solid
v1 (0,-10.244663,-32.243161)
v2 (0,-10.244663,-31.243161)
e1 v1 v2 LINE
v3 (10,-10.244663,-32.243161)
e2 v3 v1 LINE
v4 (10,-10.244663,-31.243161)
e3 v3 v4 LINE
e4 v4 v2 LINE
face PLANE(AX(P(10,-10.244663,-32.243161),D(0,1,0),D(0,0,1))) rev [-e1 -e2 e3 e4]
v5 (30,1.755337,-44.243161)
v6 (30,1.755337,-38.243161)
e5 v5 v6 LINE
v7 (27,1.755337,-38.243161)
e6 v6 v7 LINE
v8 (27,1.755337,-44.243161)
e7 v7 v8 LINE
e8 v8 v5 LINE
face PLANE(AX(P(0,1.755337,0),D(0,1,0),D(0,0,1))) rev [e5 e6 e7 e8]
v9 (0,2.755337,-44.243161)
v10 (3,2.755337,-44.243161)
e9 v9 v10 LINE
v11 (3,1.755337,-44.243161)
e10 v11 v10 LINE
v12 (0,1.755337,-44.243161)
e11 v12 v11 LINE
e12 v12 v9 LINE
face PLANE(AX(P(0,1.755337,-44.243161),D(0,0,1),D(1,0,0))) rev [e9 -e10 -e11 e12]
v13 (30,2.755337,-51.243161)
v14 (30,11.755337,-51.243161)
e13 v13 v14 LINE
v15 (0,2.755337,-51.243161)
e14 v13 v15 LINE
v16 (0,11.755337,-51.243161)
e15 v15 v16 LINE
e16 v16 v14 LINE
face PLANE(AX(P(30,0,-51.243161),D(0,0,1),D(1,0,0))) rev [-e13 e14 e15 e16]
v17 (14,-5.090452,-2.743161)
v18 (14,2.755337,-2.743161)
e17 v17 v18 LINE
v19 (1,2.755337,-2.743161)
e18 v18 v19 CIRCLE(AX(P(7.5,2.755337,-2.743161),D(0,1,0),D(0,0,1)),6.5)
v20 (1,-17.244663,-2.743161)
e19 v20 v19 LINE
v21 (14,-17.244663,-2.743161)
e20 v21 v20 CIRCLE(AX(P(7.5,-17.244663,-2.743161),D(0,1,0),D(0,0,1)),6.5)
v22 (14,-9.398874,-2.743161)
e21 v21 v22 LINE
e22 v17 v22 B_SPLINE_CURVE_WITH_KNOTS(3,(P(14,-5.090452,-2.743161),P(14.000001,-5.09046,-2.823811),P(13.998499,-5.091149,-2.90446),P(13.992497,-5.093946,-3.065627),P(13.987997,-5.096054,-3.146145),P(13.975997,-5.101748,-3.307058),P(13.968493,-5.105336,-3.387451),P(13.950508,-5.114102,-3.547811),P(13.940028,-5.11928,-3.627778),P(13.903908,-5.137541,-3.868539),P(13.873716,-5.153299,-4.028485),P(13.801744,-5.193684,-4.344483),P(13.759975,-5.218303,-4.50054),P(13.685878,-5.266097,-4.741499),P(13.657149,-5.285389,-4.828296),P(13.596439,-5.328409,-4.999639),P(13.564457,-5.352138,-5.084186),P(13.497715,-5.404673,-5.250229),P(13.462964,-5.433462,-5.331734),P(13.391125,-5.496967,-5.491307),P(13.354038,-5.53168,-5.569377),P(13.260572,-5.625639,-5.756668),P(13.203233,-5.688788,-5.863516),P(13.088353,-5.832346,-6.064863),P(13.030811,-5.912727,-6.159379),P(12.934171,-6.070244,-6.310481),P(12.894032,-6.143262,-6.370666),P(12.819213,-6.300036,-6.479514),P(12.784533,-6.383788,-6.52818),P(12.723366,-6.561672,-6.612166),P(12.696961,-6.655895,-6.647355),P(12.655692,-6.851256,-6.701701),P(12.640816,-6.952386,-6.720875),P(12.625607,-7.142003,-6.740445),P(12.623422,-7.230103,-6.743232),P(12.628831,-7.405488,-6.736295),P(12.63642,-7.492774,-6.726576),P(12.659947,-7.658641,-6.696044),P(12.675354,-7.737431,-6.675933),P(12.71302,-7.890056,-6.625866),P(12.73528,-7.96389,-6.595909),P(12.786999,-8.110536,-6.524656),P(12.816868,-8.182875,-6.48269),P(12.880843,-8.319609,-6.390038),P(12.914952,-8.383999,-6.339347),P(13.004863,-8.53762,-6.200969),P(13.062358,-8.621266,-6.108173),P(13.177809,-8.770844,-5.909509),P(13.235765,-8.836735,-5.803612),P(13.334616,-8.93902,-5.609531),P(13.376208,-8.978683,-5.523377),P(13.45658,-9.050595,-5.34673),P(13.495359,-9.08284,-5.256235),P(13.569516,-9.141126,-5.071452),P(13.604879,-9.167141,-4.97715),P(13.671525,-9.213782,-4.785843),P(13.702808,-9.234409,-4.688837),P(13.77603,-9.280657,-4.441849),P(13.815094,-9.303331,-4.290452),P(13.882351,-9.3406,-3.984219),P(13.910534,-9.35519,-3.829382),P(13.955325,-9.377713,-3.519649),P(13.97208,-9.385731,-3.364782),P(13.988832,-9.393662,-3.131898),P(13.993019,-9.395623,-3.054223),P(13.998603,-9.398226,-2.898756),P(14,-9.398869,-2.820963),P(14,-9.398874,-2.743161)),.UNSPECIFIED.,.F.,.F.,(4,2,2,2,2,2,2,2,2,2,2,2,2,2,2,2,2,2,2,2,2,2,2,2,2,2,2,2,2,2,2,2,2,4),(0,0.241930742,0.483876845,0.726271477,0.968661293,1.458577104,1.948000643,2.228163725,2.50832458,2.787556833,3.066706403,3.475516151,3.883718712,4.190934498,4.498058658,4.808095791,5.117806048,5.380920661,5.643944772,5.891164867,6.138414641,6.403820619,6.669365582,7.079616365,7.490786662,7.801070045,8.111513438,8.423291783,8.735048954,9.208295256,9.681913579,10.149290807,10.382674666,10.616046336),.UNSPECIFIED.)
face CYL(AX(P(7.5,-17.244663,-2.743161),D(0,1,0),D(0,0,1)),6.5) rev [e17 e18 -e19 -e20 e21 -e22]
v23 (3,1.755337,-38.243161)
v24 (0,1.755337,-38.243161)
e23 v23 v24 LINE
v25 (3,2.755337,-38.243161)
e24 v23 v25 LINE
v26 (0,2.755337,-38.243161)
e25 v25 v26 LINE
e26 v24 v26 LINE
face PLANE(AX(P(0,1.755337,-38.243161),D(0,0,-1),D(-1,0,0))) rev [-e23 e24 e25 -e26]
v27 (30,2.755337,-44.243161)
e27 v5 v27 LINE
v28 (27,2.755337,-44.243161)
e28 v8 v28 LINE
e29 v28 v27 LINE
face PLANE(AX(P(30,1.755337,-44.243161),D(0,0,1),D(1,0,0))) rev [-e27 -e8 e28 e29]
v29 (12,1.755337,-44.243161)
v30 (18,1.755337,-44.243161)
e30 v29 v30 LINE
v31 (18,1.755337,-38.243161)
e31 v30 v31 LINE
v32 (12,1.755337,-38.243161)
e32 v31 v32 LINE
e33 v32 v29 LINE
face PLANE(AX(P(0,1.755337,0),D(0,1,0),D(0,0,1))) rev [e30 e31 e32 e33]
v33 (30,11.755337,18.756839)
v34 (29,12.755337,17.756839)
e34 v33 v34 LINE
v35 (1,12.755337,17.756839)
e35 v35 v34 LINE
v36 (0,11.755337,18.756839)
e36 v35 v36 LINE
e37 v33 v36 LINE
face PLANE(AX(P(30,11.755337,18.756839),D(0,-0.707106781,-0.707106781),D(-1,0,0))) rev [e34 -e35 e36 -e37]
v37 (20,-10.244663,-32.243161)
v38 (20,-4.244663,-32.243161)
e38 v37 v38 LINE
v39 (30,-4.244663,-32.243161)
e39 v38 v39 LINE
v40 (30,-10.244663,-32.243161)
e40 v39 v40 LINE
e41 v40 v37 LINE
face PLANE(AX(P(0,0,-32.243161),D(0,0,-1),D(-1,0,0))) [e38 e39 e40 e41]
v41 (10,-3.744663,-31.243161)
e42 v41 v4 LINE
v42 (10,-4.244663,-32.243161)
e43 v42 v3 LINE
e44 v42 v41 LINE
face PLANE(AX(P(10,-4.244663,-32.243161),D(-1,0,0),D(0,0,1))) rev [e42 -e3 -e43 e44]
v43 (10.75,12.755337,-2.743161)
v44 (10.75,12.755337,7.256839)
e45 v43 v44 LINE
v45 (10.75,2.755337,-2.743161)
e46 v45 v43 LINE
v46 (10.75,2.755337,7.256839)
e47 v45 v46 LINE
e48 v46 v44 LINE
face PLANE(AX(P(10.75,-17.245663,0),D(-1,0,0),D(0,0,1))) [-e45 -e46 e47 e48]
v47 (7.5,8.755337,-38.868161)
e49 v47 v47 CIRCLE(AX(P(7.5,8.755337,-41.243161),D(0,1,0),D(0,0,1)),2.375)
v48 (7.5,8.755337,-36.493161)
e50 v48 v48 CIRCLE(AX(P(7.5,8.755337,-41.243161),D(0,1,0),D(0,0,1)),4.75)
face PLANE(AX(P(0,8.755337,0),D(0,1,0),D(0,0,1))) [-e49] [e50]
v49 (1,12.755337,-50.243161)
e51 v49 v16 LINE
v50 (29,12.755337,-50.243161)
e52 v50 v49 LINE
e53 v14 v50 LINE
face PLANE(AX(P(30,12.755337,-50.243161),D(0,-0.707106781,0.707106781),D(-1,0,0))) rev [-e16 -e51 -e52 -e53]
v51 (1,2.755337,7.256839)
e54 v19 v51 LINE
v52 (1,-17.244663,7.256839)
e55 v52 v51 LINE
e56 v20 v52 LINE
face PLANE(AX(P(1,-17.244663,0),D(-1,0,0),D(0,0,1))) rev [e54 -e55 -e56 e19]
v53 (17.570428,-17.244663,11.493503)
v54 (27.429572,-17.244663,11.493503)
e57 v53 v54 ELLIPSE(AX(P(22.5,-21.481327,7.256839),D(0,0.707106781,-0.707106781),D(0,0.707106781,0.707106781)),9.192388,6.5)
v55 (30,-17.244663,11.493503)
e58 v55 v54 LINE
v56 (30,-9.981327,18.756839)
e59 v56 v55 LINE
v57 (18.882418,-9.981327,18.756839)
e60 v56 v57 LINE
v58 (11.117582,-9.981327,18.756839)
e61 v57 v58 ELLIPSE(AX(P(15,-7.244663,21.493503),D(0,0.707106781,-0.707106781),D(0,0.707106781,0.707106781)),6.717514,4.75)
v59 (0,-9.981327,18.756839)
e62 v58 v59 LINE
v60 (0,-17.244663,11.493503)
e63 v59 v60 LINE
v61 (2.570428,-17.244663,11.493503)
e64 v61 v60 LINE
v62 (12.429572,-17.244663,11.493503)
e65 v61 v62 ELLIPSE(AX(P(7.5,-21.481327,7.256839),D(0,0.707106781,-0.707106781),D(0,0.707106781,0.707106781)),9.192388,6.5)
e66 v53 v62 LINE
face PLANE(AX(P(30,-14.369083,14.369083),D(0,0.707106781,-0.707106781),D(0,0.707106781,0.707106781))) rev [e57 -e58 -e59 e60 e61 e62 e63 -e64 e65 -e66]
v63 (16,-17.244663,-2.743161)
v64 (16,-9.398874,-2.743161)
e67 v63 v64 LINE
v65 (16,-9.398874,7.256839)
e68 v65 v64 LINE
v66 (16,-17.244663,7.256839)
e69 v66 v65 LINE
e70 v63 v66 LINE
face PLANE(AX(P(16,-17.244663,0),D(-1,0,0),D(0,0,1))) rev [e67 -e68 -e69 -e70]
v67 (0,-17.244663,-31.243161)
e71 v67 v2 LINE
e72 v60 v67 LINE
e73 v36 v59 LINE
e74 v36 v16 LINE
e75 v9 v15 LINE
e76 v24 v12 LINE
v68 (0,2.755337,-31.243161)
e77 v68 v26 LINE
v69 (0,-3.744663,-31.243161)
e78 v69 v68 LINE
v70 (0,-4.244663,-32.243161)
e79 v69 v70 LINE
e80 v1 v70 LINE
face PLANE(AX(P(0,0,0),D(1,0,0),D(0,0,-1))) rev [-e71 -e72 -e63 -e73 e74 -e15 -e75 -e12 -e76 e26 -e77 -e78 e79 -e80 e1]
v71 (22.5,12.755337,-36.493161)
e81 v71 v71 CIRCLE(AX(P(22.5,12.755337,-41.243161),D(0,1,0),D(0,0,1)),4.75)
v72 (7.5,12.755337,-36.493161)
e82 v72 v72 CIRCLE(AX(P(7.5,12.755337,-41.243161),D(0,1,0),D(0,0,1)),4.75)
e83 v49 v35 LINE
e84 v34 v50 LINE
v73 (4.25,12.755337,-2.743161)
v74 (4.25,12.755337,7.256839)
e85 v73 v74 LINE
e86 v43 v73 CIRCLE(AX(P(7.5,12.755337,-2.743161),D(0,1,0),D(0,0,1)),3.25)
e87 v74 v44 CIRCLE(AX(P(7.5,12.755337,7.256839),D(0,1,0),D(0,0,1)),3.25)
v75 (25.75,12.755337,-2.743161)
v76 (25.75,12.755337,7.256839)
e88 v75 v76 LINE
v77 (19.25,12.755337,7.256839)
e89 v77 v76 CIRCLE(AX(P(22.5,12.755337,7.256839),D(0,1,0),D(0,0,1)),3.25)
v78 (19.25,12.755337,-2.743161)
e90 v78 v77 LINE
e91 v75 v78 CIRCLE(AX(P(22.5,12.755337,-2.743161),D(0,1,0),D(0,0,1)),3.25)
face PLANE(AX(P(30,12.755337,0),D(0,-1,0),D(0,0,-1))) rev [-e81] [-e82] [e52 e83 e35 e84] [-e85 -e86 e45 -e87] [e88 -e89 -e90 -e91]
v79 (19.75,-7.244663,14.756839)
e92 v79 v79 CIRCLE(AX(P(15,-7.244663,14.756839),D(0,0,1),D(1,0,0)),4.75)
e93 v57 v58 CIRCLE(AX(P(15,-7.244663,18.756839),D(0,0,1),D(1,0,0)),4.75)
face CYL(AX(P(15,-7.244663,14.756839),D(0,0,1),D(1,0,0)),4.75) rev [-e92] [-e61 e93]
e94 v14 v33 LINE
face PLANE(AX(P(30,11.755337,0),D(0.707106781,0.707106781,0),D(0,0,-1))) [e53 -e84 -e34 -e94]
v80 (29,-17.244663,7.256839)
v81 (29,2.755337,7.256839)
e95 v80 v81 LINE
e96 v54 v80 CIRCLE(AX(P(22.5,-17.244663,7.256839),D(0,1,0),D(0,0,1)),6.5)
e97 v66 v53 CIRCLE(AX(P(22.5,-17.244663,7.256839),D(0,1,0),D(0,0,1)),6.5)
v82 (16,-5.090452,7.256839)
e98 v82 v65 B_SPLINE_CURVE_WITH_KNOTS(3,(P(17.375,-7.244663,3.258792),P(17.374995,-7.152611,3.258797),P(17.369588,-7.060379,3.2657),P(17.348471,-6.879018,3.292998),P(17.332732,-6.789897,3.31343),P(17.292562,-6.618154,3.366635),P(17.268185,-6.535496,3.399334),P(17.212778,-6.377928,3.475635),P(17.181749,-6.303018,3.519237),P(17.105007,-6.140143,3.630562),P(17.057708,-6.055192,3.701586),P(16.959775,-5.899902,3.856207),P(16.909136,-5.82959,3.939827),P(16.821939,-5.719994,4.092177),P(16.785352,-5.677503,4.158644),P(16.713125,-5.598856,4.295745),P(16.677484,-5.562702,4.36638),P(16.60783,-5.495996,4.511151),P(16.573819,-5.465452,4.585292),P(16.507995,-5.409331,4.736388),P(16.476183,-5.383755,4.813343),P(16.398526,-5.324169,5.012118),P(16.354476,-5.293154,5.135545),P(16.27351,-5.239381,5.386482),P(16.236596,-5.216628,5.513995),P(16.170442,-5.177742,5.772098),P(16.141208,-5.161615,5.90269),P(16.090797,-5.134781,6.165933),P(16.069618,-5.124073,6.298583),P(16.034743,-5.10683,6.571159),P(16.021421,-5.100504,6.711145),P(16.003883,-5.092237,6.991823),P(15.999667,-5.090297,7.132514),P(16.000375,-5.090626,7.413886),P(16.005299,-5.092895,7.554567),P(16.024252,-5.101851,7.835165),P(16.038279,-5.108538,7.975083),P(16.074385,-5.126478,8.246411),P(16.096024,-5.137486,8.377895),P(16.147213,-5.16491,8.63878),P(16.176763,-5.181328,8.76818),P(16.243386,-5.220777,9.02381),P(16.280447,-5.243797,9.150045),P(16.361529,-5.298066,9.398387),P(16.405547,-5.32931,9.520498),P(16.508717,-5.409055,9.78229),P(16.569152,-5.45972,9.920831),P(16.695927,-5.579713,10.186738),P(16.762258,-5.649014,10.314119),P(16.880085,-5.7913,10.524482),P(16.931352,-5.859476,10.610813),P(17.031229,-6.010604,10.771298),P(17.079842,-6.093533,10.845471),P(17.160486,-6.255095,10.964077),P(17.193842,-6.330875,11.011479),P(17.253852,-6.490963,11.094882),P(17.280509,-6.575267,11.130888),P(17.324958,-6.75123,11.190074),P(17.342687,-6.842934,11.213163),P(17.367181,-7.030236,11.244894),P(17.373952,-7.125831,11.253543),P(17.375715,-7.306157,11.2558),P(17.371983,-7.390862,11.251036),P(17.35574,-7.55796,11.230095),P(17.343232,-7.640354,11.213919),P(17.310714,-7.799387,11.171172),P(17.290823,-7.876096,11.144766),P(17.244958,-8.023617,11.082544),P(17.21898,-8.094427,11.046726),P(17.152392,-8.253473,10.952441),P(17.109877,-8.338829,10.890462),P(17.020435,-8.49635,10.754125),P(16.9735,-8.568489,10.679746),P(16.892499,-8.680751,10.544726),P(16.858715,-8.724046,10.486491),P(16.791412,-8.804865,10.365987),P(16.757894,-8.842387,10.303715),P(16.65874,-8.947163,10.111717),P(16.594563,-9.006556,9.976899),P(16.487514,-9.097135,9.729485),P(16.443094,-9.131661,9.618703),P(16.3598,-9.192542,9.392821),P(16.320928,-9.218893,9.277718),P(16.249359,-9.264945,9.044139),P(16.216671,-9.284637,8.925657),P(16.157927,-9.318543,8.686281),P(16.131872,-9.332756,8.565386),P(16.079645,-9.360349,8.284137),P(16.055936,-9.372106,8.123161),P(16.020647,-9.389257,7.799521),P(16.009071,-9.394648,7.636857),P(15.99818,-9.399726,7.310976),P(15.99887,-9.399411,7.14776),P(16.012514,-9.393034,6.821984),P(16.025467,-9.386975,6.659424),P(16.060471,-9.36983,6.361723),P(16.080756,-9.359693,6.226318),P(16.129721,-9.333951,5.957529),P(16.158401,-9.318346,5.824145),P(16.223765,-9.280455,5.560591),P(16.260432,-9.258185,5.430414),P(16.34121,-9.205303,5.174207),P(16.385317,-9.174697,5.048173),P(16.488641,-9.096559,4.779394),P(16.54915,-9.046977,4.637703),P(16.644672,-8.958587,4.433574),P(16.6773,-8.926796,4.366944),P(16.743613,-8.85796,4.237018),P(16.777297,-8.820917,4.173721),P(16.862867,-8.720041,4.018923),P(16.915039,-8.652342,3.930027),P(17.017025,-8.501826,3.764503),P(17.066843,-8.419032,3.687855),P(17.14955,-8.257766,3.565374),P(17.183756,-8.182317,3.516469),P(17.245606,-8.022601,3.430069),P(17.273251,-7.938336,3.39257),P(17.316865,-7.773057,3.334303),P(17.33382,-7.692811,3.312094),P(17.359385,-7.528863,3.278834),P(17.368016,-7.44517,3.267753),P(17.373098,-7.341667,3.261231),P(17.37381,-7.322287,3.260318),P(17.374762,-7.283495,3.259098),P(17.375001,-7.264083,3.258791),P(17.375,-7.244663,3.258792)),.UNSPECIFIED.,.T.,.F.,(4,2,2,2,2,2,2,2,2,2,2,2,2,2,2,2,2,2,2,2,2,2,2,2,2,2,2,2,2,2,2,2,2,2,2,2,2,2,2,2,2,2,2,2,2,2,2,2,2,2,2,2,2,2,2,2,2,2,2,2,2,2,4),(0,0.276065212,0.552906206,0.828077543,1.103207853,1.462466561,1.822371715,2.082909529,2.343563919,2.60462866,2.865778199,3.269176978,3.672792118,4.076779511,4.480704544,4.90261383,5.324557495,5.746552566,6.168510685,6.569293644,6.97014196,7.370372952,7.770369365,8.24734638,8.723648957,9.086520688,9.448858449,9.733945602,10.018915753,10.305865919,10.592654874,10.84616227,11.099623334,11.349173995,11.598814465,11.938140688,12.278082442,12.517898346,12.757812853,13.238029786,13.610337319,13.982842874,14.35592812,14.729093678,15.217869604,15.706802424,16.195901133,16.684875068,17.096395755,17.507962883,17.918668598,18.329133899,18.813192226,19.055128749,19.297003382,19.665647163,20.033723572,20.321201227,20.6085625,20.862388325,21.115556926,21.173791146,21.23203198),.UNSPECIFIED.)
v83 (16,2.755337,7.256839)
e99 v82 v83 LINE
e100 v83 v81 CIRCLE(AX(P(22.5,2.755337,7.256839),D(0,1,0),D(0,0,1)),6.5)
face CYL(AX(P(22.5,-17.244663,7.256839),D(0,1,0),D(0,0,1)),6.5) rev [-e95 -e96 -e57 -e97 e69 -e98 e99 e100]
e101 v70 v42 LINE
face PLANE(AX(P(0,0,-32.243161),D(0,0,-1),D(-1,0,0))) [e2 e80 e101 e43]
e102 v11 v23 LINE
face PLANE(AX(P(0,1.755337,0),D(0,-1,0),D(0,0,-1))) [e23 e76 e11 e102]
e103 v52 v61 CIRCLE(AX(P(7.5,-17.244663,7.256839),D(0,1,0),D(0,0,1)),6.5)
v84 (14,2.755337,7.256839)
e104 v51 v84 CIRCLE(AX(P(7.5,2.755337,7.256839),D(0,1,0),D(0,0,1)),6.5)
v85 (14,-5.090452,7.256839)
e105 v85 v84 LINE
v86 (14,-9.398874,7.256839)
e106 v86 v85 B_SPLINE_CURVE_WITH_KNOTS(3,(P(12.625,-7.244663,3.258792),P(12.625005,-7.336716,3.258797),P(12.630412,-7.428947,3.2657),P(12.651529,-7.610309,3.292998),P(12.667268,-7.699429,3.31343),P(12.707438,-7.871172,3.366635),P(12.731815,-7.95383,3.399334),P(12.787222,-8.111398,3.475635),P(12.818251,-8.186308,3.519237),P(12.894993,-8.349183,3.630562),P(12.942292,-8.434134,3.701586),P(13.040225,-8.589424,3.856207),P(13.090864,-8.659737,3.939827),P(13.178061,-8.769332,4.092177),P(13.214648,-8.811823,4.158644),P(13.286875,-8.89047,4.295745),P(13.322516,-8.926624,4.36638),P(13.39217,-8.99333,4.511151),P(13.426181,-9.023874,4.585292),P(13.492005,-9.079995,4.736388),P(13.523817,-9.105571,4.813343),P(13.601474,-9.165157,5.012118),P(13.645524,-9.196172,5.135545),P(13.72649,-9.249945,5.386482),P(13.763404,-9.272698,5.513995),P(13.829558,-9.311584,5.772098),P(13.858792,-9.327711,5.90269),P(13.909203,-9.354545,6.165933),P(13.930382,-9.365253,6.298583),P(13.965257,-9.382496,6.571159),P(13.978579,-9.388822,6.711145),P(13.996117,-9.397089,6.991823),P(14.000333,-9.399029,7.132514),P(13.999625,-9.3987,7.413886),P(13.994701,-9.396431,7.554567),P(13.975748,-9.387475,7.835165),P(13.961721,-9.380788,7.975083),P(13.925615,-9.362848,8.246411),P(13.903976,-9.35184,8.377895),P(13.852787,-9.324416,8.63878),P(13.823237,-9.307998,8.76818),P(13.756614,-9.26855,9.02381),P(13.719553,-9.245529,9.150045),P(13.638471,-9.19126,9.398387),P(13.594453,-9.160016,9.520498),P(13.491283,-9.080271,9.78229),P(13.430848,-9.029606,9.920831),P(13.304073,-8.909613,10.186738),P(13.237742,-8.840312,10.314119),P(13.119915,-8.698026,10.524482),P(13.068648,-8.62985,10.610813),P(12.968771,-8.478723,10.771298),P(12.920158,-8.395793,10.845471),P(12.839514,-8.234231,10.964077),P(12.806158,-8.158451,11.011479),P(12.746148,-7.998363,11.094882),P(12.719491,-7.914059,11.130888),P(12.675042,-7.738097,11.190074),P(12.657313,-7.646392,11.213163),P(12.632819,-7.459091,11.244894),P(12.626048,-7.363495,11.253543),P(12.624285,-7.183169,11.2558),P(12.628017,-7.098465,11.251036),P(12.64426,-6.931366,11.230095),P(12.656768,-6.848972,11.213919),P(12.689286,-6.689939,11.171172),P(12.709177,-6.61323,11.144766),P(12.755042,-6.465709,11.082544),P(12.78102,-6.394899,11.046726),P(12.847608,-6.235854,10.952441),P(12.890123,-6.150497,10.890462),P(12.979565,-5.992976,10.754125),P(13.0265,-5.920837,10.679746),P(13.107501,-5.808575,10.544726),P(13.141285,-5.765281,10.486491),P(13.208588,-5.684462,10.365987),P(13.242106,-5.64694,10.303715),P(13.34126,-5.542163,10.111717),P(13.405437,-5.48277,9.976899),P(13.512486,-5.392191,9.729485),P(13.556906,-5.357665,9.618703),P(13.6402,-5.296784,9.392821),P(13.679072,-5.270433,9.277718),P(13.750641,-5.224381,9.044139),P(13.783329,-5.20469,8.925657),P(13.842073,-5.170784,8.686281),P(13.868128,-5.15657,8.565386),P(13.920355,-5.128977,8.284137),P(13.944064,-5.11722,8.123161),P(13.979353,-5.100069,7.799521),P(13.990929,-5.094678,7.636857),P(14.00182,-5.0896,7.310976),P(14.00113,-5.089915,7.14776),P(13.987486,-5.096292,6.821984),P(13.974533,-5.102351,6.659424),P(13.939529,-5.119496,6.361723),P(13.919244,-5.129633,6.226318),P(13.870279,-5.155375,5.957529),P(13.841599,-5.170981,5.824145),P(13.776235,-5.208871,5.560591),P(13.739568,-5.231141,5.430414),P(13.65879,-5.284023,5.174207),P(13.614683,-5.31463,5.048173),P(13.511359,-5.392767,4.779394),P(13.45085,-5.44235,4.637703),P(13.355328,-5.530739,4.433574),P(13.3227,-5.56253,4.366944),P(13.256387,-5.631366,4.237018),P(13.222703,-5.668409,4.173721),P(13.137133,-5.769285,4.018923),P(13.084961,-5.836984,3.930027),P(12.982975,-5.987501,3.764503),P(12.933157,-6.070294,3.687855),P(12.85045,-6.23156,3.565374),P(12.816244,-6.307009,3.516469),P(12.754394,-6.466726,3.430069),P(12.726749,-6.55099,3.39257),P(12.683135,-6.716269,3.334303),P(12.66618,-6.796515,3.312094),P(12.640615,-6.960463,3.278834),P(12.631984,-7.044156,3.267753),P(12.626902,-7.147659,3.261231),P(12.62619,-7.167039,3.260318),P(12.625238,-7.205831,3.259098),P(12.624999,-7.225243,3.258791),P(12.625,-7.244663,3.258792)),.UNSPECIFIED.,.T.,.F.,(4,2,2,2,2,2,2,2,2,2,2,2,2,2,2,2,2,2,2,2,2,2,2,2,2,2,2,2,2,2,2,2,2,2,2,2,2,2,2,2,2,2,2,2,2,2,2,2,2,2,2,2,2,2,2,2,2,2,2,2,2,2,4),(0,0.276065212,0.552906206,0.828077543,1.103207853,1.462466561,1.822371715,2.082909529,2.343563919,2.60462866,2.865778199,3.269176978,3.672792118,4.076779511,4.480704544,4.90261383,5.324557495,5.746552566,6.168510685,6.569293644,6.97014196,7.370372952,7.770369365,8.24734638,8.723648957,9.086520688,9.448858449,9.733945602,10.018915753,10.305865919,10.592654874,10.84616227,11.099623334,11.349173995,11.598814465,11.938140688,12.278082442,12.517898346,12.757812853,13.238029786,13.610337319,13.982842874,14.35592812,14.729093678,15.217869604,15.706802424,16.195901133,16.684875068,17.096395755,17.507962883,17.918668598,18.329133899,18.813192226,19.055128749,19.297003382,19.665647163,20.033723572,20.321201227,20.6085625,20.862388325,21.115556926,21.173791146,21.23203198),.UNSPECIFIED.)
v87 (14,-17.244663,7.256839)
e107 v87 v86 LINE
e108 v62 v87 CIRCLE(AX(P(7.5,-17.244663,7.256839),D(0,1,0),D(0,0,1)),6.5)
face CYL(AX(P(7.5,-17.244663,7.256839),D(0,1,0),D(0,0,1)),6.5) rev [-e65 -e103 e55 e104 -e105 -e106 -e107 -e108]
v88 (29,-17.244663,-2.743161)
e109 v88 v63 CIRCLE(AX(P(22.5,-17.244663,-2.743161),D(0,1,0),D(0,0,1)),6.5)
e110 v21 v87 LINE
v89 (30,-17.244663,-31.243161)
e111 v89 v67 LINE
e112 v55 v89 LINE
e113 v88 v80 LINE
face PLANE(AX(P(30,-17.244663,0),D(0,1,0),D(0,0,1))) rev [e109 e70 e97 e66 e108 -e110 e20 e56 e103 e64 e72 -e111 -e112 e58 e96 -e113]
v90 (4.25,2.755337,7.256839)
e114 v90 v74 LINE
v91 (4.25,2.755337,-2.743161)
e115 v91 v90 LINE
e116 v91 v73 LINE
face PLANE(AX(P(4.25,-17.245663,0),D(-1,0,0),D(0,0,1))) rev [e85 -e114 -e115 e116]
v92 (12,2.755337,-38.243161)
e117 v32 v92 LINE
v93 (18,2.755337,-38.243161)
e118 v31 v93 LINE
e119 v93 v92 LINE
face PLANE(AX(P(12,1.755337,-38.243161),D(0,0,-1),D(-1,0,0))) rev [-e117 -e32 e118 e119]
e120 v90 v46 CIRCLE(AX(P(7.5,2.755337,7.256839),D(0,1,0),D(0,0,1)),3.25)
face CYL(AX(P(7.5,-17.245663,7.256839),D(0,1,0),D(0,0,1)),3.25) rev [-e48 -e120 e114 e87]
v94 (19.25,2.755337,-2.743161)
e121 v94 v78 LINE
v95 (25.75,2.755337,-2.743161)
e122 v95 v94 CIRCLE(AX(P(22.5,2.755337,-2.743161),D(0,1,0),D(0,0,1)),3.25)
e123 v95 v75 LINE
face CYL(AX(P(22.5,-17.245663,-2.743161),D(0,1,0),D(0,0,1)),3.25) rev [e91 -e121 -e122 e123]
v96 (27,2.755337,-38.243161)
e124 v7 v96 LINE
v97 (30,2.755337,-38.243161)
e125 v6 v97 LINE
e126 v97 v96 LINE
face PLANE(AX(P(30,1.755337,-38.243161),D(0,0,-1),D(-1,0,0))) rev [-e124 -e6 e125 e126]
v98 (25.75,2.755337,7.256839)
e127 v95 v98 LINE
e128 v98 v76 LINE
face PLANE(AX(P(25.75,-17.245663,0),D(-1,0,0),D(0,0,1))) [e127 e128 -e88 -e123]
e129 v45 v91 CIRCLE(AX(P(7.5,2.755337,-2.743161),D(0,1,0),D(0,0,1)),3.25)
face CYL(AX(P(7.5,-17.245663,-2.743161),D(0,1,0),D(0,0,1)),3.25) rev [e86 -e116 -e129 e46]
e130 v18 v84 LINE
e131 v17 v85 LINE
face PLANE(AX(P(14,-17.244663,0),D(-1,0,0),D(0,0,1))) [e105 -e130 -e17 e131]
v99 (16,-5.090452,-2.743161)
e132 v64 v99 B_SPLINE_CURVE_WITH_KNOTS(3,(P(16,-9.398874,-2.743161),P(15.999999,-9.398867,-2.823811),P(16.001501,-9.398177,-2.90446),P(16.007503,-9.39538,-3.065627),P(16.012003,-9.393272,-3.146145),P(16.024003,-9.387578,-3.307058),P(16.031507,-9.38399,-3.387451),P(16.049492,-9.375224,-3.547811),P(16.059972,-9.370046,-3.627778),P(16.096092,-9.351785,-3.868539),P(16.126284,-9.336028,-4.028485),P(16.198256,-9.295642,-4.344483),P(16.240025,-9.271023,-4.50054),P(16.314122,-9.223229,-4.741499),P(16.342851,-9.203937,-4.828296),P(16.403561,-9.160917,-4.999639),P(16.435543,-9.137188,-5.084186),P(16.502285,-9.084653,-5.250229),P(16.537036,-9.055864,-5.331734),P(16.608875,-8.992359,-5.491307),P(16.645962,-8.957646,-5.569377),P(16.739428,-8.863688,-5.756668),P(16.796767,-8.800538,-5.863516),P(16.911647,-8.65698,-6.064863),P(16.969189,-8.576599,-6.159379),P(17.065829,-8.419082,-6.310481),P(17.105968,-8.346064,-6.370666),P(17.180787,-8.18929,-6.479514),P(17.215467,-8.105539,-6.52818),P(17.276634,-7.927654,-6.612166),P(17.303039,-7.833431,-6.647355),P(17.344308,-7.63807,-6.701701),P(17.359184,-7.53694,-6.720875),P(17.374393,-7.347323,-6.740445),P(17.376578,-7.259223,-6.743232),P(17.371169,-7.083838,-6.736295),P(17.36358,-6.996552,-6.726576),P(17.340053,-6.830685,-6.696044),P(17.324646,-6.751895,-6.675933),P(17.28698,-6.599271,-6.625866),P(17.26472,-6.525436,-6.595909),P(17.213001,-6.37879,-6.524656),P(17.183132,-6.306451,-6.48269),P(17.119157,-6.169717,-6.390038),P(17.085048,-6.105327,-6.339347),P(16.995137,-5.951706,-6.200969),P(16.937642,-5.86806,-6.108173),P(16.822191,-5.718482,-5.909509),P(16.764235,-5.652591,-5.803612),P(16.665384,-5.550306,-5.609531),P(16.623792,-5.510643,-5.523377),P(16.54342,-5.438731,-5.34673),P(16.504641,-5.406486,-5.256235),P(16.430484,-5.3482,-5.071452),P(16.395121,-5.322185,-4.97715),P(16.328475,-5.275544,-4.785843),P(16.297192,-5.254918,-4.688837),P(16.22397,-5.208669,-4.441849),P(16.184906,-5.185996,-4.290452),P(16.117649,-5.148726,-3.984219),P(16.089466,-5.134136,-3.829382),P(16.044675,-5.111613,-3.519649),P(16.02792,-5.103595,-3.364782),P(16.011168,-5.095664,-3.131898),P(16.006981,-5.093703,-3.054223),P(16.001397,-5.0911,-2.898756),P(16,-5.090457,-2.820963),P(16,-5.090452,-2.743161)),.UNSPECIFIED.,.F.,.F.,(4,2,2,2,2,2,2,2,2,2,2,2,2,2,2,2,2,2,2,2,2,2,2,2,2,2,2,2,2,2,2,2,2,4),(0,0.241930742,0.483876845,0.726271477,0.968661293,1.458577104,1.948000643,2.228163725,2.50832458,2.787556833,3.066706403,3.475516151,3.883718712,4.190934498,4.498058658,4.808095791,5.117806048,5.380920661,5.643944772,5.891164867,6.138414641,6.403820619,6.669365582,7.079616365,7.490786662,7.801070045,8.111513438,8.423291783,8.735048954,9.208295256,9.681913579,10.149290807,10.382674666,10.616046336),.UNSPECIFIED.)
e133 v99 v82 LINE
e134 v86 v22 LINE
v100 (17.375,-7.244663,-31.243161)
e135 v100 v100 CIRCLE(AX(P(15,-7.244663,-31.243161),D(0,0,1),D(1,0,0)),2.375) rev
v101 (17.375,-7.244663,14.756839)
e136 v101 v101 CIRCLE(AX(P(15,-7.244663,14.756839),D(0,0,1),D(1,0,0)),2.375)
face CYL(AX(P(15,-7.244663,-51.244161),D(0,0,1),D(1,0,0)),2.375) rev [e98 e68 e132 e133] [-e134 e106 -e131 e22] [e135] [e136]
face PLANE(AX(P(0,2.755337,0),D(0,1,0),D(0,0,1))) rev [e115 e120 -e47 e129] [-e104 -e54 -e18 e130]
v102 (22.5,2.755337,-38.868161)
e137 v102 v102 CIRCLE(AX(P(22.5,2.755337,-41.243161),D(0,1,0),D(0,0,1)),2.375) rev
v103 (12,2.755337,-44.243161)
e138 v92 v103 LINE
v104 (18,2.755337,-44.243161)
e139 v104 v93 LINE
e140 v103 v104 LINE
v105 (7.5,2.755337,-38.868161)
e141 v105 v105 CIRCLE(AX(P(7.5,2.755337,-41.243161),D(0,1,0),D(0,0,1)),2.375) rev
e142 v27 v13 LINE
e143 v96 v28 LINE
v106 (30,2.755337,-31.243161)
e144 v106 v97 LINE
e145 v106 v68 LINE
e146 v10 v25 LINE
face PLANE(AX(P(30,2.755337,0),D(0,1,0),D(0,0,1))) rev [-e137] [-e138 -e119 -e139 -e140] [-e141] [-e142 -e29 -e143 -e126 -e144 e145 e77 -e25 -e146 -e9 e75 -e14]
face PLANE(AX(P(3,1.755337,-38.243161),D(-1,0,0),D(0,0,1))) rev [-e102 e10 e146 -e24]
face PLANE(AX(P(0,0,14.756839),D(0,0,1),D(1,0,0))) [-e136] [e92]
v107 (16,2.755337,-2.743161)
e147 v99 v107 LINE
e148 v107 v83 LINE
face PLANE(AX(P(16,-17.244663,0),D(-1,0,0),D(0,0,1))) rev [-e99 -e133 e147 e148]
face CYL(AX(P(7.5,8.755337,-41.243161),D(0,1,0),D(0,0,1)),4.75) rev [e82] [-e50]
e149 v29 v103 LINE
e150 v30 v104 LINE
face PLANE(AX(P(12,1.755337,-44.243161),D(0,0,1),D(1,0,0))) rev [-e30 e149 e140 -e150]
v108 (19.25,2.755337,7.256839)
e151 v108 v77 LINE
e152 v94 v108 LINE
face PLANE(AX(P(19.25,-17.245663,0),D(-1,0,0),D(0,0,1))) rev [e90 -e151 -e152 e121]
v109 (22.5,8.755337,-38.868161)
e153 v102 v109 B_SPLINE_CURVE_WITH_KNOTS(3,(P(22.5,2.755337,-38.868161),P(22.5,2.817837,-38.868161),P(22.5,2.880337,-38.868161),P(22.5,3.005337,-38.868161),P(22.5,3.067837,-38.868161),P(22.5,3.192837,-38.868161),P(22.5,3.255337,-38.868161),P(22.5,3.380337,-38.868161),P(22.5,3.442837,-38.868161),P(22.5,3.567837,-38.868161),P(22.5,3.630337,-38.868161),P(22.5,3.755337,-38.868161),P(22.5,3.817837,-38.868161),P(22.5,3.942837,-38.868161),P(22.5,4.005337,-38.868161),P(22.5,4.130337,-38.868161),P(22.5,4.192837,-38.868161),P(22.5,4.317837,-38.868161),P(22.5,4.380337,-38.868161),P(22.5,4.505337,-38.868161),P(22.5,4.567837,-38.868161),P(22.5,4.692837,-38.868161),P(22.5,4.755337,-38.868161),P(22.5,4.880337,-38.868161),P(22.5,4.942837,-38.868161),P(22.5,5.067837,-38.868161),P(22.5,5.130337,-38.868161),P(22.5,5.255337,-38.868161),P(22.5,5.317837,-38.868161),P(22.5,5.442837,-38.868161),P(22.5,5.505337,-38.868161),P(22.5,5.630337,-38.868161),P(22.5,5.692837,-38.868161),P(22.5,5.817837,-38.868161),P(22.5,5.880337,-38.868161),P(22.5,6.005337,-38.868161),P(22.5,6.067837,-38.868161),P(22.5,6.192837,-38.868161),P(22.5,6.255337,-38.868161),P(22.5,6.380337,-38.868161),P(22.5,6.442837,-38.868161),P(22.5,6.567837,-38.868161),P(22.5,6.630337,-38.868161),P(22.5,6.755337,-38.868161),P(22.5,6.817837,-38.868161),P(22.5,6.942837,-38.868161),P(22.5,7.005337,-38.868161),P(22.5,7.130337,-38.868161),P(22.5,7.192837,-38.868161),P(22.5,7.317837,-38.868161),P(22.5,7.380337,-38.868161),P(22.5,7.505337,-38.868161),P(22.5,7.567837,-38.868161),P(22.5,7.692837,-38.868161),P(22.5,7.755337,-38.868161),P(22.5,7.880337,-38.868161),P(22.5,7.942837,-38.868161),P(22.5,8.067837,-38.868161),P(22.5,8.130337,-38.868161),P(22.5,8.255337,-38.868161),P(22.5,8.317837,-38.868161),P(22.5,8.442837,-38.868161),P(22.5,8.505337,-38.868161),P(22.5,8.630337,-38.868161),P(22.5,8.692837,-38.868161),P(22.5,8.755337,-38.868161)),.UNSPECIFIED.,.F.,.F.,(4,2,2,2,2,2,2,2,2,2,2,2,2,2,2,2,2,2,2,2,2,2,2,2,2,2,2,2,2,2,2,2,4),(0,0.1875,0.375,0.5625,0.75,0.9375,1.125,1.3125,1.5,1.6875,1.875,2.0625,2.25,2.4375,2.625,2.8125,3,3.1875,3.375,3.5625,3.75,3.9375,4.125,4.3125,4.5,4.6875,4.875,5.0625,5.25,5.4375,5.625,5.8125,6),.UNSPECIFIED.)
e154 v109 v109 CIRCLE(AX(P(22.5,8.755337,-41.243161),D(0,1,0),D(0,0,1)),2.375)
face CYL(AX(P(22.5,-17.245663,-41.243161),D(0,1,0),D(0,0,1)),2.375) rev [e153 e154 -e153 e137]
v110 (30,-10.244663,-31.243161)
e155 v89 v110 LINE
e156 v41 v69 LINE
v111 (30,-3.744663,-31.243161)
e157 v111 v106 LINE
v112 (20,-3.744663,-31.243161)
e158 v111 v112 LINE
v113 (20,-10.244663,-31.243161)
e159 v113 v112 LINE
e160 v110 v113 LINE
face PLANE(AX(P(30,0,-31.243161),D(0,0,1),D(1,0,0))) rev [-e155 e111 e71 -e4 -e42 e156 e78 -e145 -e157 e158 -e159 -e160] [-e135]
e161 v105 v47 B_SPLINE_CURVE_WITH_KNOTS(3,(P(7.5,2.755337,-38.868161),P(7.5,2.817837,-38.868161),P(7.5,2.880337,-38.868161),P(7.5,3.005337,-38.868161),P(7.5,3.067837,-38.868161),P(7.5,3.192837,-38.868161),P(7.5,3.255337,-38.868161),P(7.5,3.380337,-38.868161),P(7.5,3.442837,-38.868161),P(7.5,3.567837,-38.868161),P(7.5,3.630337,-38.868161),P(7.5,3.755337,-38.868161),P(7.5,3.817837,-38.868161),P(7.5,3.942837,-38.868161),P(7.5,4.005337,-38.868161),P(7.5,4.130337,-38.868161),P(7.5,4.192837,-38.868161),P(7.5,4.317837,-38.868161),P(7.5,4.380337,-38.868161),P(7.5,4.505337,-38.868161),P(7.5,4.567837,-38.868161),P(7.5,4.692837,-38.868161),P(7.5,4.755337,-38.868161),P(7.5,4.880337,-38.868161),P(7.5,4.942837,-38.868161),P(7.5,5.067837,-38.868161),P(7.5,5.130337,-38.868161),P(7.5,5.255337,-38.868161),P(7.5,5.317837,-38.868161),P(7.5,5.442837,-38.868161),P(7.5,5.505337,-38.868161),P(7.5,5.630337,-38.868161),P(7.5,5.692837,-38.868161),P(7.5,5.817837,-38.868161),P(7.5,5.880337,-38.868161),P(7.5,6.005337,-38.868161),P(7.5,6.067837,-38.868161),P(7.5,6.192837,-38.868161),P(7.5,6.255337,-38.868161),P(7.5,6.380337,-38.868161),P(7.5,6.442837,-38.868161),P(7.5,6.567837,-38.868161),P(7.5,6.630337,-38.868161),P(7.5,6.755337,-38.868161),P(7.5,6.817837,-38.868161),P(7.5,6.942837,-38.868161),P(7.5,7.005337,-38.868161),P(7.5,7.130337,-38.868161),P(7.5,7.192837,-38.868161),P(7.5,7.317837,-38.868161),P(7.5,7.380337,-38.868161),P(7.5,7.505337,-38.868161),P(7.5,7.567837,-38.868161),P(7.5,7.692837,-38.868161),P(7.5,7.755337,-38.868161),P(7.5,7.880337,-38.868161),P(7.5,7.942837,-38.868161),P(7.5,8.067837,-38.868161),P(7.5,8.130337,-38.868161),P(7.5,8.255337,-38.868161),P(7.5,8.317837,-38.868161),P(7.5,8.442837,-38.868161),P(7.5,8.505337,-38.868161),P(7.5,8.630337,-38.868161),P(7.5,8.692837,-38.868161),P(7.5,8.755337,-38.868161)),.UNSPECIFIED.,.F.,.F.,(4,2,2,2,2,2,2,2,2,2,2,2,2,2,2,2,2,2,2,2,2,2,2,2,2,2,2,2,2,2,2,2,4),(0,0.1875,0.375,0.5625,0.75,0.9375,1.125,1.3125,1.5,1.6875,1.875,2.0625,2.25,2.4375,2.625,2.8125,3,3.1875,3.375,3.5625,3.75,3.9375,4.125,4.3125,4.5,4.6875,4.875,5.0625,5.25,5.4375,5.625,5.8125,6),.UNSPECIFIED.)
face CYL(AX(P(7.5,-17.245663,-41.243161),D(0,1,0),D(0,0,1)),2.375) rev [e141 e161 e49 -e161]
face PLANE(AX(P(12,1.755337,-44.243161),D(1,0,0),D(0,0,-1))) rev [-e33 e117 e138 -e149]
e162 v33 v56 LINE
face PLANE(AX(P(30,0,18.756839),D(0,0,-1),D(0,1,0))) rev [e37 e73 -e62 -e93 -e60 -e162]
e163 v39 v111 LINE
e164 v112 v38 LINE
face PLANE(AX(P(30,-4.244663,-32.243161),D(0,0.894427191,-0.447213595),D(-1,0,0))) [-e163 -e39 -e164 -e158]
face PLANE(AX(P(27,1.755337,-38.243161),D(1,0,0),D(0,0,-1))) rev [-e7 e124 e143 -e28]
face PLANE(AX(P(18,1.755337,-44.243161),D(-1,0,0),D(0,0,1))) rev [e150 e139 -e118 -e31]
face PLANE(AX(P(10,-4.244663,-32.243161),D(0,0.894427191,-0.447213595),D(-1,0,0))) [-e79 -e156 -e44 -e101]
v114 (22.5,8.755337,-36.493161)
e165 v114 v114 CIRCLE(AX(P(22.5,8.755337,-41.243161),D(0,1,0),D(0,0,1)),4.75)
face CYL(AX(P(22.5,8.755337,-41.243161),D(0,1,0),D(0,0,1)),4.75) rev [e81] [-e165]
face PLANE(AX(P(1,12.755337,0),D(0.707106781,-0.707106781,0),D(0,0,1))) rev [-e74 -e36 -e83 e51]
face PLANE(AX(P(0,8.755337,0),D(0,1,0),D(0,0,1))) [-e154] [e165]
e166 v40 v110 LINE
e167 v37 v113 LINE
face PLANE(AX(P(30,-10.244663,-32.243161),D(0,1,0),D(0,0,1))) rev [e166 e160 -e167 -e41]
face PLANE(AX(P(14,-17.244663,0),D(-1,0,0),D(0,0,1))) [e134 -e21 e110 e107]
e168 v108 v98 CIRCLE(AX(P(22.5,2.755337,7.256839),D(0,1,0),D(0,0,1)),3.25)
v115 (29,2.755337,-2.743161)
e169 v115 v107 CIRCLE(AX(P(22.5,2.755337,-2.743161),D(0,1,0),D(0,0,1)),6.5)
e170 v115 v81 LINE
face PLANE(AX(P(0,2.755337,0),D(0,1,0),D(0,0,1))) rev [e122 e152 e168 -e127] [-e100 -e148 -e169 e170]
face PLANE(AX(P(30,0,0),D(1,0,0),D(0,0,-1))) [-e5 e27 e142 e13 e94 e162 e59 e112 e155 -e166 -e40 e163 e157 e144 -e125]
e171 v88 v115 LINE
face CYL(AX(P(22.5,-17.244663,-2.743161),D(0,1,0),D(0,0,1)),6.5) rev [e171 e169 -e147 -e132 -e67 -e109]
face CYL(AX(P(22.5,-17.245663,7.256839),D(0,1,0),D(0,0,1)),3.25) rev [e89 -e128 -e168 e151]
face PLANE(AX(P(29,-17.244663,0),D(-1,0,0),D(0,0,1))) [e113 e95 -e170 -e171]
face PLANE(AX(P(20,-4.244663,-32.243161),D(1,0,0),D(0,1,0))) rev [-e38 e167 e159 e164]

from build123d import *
from OCP.BRepFilletAPI import BRepFilletAPI_MakeChamfer

# Parameters (mm, degrees)
RESSALTO_EXTRUS_O1_DEPTH = 30
CORTE_EXTRUS_O1_REACH    = 68.527
ESBO_O2_R                = 2.375
ESBO_O2_3_R              = 4.75
ESBO_O2_3_R_2            = 2.375
CORTE_EXTRUS_O3_DEPTH    = 4
CORTE_EXTRUS_O2_REACH    = 80.086
ESBO_O3_R                = 2.375
ESBO_O3_3_R              = 2.375
CORTE_EXTRUS_O4_DEPTH    = 4
ESBO_O4_W                = 6
ESBO_O4_H                = 6
ESBO_O4_W_2              = 3
RESSALTO_EXTRUS_O2_DEPTH = 1
CORTE_EXTRUS_O5_START    = -10
CORTE_EXTRUS_O5_DEPTH    = 57.527149202
CHANFRO1_SIZE            = 1
ESBO_O6_W                = 10
ESBO_O6_H                = 6
RESSALTO_EXTRUS_O3_DEPTH = 1
CHANFRO2_SIZE            = 0.5
CHANFRO2_SIZE_2          = 1


with BuildPart() as part:
    # Esboço1 → Ressalto-extrusão1 (new body)
    with BuildSketch(Plane(origin=(0, 0, 0), x_dir=(0, 0, -1), z_dir=(1, 0, 0))):
        Polygon((51.243161309, 12.755336939), (-18.756838691, 12.755336939), (-18.756838691, -9.981327227), (-11.493502857, -17.244663061), (31.243161309, -17.244663061), (31.243161309, 2.755336939), (51.243161309, 2.755336939), align=None)
    extrude(amount=RESSALTO_EXTRUS_O1_DEPTH)

    # Esboço2 → Corte-extrusão1 (cut, up to next)
    with BuildSketch(Plane(origin=(0, 12.755336939, 0), x_dir=(1, 0, 0), z_dir=(0, 1, 0)), mode=Mode.PRIVATE) as corte_extrus_o1_sk1:
        with Locations(Location((7.5, 41.243161309, 0), (0, 0, 270))):
            Circle(ESBO_O2_R)
    corte_extrus_o1_tool1 = extrude(corte_extrus_o1_sk1.sketch, amount=-CORTE_EXTRUS_O1_REACH, mode=Mode.PRIVATE) & part.part
    # Esboço2 → Corte-extrusão1 (cut, up to next)
    with BuildSketch(Plane(origin=(0, 12.755336939, 0), x_dir=(1, 0, 0), z_dir=(0, 1, 0)), mode=Mode.PRIVATE) as corte_extrus_o1_sk2:
        with Locations(Location((22.5, 41.243161309, 0), (0, 0, 270))):
            Circle(ESBO_O2_R)
    corte_extrus_o1_tool2 = extrude(corte_extrus_o1_sk2.sketch, amount=-CORTE_EXTRUS_O1_REACH, mode=Mode.PRIVATE) & part.part
    # Esboço2 → Corte-extrusão1 (cut, up to next)
    with BuildSketch(Plane(origin=(0, 12.755336939, 0), x_dir=(1, 0, 0), z_dir=(0, 1, 0)), mode=Mode.PRIVATE) as corte_extrus_o1_sk3:
        with BuildLine():
            Line((4.25, 2.743161309), (4.25, -7.256838691))
            ThreePointArc((4.25, -7.256838691), (7.5, -10.506838691), (10.75, -7.256838691))
            Line((10.75, -7.256838691), (10.75, 2.743161309))
            ThreePointArc((10.75, 2.743161309), (7.5, 5.993161309), (4.25, 2.743161309))
        make_face()
    corte_extrus_o1_tool3 = extrude(corte_extrus_o1_sk3.sketch, amount=-CORTE_EXTRUS_O1_REACH, mode=Mode.PRIVATE) & part.part
    # Esboço2 → Corte-extrusão1 (cut, up to next)
    with BuildSketch(Plane(origin=(0, 12.755336939, 0), x_dir=(1, 0, 0), z_dir=(0, 1, 0)), mode=Mode.PRIVATE) as corte_extrus_o1_sk4:
        with BuildLine():
            Line((19.25, 2.743161309), (19.25, -7.256838691))
            ThreePointArc((19.25, -7.256838691), (22.5, -10.506838691), (25.75, -7.256838691))
            Line((25.75, -7.256838691), (25.75, 2.743161309))
            ThreePointArc((25.75, 2.743161309), (22.5, 5.993161309), (19.25, 2.743161309))
        make_face()
    corte_extrus_o1_tool4 = extrude(corte_extrus_o1_sk4.sketch, amount=-CORTE_EXTRUS_O1_REACH, mode=Mode.PRIVATE) & part.part
    add(corte_extrus_o1_tool1.solids().sort_by_distance((7.5, 12.755337, -41.243161))[0], mode=Mode.SUBTRACT)
    add(corte_extrus_o1_tool2.solids().sort_by_distance((22.5, 12.755337, -41.243161))[0], mode=Mode.SUBTRACT)
    add(corte_extrus_o1_tool3.solids().sort_by_distance((7.5, 12.755337, 2.256839))[0], mode=Mode.SUBTRACT)
    add(corte_extrus_o1_tool4.solids().sort_by_distance((22.5, 12.755337, 2.256839))[0], mode=Mode.SUBTRACT)

    # Esboço2<3> → Corte-extrusão3 (cut)
    # profile 1 of 2: a face of its own
    with BuildSketch(Plane(origin=(0, 12.755336939, 0), x_dir=(1, 0, 0), z_dir=(0, 1, 0))):
        with Locations(Location((7.5, 41.243161309, 0), (0, 0, 270))):
            Circle(ESBO_O2_3_R)
        with Locations(Location((7.5, 41.243161309, 0), (0, 0, 270))):
            Circle(ESBO_O2_3_R_2, mode=Mode.SUBTRACT)
    # profile 2 of 2: a face of its own
    with BuildSketch(Plane(origin=(0, 12.755336939, 0), x_dir=(1, 0, 0), z_dir=(0, 1, 0))):
        with Locations(Location((22.5, 41.243161309, 0), (0, 0, 270))):
            Circle(ESBO_O2_3_R)
        with Locations(Location((22.5, 41.243161309, 0), (0, 0, 270))):
            Circle(ESBO_O2_3_R_2, mode=Mode.SUBTRACT)
    extrude(amount=-CORTE_EXTRUS_O3_DEPTH, mode=Mode.SUBTRACT)

    # Esboço3 → Corte-extrusão2 (cut, up to next)
    with BuildSketch(Plane.XY.offset(18.756838691), mode=Mode.PRIVATE) as corte_extrus_o2_sk1:
        with Locations((15, -7.244663061)):
            Circle(ESBO_O3_R)
    corte_extrus_o2_tool1 = extrude(corte_extrus_o2_sk1.sketch, amount=-CORTE_EXTRUS_O2_REACH, mode=Mode.PRIVATE) & part.part
    add(corte_extrus_o2_tool1.solids().sort_by_distance((15, -7.244663, 18.756839))[0], mode=Mode.SUBTRACT)

    # Esboço3<3> → Corte-extrusão4 (cut)
    # profile 1 of 2: a face of its own
    with BuildSketch(Plane.XY.offset(18.756838691)):
        with BuildLine():
            Line((18.882417963, -9.981327227), (11.117582037, -9.981327227))
            ThreePointArc((11.117582037, -9.981327227), (15, -11.994663061), (18.882417963, -9.981327227))
        make_face()
    # profile 2 of 2: a face of its own
    with BuildSketch(Plane.XY.offset(18.756838691)):
        with BuildLine():
            ThreePointArc((18.882417963, -9.981327227), (19.527912617, -8.680109799), (19.75, -7.244663061))
            ThreePointArc((19.75, -7.244663061), (13.564553262, -2.716750444), (11.117582037, -9.981327227))
            Line((11.117582037, -9.981327227), (18.882417963, -9.981327227))
        make_face()
        with Locations((15, -7.244663061)):
            Circle(ESBO_O3_3_R, mode=Mode.SUBTRACT)
    extrude(amount=-CORTE_EXTRUS_O4_DEPTH, mode=Mode.SUBTRACT)

    # Esboço4 → Ressalto-extrusão2 (add)
    with BuildSketch(Plane.XZ.offset(-2.755336939)):
        with Locations((15, -41.243161309)):
            Rectangle(ESBO_O4_W, ESBO_O4_H)
        with Locations((1.5, -41.243161309)):
            Rectangle(ESBO_O4_W_2, ESBO_O4_H)
        with Locations((28.5, -41.243161309)):
            Rectangle(ESBO_O4_W_2, ESBO_O4_H)
    extrude(amount=RESSALTO_EXTRUS_O2_DEPTH)

    # Esboço2<4> → Corte-extrusão5 (cut, through all)
    # profile 1 of 2: a face of its own
    with BuildSketch(Plane(origin=(0, 12.755336939, 0), x_dir=(1, 0, 0), z_dir=(0, 1, 0)).offset(CORTE_EXTRUS_O5_START)):
        with BuildLine():
            Line((1, 2.743161309), (1, -7.256838691))
            ThreePointArc((1, -7.256838691), (7.5, -13.756838691), (14, -7.256838691))
            Line((14, -7.256838691), (14, 2.743161309))
            ThreePointArc((14, 2.743161309), (7.5, 9.243161309), (1, 2.743161309))
        make_face()
        with BuildLine():
            ThreePointArc((10.75, 2.743161309), (7.5, 5.993161309), (4.25, 2.743161309))
            Line((4.25, 2.743161309), (4.25, -7.256838691))
            ThreePointArc((4.25, -7.256838691), (7.5, -10.506838691), (10.75, -7.256838691))
            Line((10.75, -7.256838691), (10.75, 2.743161309))
        make_face(mode=Mode.SUBTRACT)
    # profile 2 of 2: a face of its own
    with BuildSketch(Plane(origin=(0, 12.755336939, 0), x_dir=(1, 0, 0), z_dir=(0, 1, 0)).offset(CORTE_EXTRUS_O5_START)):
        with BuildLine():
            Line((16, 2.743161309), (16, -7.256838691))
            ThreePointArc((16, -7.256838691), (22.5, -13.756838691), (29, -7.256838691))
            Line((29, -7.256838691), (29, 2.743161309))
            ThreePointArc((29, 2.743161309), (22.5, 9.243161309), (16, 2.743161309))
        make_face()
        with BuildLine():
            ThreePointArc((25.75, 2.743161309), (22.5, 5.993161309), (19.25, 2.743161309))
            Line((19.25, 2.743161309), (19.25, -7.256838691))
            ThreePointArc((19.25, -7.256838691), (22.5, -10.506838691), (25.75, -7.256838691))
            Line((25.75, -7.256838691), (25.75, 2.743161309))
        make_face(mode=Mode.SUBTRACT)
    extrude(amount=-CORTE_EXTRUS_O5_DEPTH, mode=Mode.SUBTRACT)

    # Chanfro1
    chanfro1_edges = [part.edges().sort_by_distance(p)[0] for p in [
        (0, 12.755336939, -16.243161309),
        (30, 12.755336939, -16.243161309),
        (15, 12.755336939, 18.756838691),
        (15, 12.755336939, -51.243161309),
    ]]
    chamfer(chanfro1_edges, length=CHANFRO1_SIZE)

    # Esboço6 → Ressalto-extrusão3 (add)
    with BuildSketch(Plane(origin=(0, 0, -31.243161309), x_dir=(-1, 0, 0), z_dir=(0, 0, -1))):
        with Locations((-25, -7.244663061)):
            Rectangle(ESBO_O6_W, ESBO_O6_H)
        with Locations((-5, -7.244663061)):
            Rectangle(ESBO_O6_W, ESBO_O6_H)
    extrude(amount=RESSALTO_EXTRUS_O3_DEPTH)

    # Chanfro2
    chanfro2_edges_1 = [part.edges().sort_by_distance(p)[0] for p in [
        (25, -4.244663061, -31.243161309),
    ]]
    chanfro2_side_1 = [part.faces().sort_by_distance(p)[0] for p in [
        (25, -4.234663061, -31.243161309),
    ]]
    chanfro2_edges_2 = [part.edges().sort_by_distance(p)[0] for p in [
        (5, -4.244663061, -31.243161309),
    ]]
    chanfro2_side_2 = [part.faces().sort_by_distance(p)[0] for p in [
        (5, -4.234663061, -31.243161309),
    ]]
    chanfro2 = BRepFilletAPI_MakeChamfer(part.part.solid().wrapped)
    for e in chanfro2_edges_1:
        chanfro2.Add(CHANFRO2_SIZE - 0.0001, CHANFRO2_SIZE_2 - 0.0001, e.wrapped, chanfro2_side_1[0].wrapped)
    for e in chanfro2_edges_2:
        chanfro2.Add(CHANFRO2_SIZE - 0.0001, CHANFRO2_SIZE_2 - 0.0001, e.wrapped, chanfro2_side_2[0].wrapped)
    add(Compound.cast(chanfro2.Shape()), mode=Mode.REPLACE)  # a hair under: the kernel refuses the full size


solid = part.part
